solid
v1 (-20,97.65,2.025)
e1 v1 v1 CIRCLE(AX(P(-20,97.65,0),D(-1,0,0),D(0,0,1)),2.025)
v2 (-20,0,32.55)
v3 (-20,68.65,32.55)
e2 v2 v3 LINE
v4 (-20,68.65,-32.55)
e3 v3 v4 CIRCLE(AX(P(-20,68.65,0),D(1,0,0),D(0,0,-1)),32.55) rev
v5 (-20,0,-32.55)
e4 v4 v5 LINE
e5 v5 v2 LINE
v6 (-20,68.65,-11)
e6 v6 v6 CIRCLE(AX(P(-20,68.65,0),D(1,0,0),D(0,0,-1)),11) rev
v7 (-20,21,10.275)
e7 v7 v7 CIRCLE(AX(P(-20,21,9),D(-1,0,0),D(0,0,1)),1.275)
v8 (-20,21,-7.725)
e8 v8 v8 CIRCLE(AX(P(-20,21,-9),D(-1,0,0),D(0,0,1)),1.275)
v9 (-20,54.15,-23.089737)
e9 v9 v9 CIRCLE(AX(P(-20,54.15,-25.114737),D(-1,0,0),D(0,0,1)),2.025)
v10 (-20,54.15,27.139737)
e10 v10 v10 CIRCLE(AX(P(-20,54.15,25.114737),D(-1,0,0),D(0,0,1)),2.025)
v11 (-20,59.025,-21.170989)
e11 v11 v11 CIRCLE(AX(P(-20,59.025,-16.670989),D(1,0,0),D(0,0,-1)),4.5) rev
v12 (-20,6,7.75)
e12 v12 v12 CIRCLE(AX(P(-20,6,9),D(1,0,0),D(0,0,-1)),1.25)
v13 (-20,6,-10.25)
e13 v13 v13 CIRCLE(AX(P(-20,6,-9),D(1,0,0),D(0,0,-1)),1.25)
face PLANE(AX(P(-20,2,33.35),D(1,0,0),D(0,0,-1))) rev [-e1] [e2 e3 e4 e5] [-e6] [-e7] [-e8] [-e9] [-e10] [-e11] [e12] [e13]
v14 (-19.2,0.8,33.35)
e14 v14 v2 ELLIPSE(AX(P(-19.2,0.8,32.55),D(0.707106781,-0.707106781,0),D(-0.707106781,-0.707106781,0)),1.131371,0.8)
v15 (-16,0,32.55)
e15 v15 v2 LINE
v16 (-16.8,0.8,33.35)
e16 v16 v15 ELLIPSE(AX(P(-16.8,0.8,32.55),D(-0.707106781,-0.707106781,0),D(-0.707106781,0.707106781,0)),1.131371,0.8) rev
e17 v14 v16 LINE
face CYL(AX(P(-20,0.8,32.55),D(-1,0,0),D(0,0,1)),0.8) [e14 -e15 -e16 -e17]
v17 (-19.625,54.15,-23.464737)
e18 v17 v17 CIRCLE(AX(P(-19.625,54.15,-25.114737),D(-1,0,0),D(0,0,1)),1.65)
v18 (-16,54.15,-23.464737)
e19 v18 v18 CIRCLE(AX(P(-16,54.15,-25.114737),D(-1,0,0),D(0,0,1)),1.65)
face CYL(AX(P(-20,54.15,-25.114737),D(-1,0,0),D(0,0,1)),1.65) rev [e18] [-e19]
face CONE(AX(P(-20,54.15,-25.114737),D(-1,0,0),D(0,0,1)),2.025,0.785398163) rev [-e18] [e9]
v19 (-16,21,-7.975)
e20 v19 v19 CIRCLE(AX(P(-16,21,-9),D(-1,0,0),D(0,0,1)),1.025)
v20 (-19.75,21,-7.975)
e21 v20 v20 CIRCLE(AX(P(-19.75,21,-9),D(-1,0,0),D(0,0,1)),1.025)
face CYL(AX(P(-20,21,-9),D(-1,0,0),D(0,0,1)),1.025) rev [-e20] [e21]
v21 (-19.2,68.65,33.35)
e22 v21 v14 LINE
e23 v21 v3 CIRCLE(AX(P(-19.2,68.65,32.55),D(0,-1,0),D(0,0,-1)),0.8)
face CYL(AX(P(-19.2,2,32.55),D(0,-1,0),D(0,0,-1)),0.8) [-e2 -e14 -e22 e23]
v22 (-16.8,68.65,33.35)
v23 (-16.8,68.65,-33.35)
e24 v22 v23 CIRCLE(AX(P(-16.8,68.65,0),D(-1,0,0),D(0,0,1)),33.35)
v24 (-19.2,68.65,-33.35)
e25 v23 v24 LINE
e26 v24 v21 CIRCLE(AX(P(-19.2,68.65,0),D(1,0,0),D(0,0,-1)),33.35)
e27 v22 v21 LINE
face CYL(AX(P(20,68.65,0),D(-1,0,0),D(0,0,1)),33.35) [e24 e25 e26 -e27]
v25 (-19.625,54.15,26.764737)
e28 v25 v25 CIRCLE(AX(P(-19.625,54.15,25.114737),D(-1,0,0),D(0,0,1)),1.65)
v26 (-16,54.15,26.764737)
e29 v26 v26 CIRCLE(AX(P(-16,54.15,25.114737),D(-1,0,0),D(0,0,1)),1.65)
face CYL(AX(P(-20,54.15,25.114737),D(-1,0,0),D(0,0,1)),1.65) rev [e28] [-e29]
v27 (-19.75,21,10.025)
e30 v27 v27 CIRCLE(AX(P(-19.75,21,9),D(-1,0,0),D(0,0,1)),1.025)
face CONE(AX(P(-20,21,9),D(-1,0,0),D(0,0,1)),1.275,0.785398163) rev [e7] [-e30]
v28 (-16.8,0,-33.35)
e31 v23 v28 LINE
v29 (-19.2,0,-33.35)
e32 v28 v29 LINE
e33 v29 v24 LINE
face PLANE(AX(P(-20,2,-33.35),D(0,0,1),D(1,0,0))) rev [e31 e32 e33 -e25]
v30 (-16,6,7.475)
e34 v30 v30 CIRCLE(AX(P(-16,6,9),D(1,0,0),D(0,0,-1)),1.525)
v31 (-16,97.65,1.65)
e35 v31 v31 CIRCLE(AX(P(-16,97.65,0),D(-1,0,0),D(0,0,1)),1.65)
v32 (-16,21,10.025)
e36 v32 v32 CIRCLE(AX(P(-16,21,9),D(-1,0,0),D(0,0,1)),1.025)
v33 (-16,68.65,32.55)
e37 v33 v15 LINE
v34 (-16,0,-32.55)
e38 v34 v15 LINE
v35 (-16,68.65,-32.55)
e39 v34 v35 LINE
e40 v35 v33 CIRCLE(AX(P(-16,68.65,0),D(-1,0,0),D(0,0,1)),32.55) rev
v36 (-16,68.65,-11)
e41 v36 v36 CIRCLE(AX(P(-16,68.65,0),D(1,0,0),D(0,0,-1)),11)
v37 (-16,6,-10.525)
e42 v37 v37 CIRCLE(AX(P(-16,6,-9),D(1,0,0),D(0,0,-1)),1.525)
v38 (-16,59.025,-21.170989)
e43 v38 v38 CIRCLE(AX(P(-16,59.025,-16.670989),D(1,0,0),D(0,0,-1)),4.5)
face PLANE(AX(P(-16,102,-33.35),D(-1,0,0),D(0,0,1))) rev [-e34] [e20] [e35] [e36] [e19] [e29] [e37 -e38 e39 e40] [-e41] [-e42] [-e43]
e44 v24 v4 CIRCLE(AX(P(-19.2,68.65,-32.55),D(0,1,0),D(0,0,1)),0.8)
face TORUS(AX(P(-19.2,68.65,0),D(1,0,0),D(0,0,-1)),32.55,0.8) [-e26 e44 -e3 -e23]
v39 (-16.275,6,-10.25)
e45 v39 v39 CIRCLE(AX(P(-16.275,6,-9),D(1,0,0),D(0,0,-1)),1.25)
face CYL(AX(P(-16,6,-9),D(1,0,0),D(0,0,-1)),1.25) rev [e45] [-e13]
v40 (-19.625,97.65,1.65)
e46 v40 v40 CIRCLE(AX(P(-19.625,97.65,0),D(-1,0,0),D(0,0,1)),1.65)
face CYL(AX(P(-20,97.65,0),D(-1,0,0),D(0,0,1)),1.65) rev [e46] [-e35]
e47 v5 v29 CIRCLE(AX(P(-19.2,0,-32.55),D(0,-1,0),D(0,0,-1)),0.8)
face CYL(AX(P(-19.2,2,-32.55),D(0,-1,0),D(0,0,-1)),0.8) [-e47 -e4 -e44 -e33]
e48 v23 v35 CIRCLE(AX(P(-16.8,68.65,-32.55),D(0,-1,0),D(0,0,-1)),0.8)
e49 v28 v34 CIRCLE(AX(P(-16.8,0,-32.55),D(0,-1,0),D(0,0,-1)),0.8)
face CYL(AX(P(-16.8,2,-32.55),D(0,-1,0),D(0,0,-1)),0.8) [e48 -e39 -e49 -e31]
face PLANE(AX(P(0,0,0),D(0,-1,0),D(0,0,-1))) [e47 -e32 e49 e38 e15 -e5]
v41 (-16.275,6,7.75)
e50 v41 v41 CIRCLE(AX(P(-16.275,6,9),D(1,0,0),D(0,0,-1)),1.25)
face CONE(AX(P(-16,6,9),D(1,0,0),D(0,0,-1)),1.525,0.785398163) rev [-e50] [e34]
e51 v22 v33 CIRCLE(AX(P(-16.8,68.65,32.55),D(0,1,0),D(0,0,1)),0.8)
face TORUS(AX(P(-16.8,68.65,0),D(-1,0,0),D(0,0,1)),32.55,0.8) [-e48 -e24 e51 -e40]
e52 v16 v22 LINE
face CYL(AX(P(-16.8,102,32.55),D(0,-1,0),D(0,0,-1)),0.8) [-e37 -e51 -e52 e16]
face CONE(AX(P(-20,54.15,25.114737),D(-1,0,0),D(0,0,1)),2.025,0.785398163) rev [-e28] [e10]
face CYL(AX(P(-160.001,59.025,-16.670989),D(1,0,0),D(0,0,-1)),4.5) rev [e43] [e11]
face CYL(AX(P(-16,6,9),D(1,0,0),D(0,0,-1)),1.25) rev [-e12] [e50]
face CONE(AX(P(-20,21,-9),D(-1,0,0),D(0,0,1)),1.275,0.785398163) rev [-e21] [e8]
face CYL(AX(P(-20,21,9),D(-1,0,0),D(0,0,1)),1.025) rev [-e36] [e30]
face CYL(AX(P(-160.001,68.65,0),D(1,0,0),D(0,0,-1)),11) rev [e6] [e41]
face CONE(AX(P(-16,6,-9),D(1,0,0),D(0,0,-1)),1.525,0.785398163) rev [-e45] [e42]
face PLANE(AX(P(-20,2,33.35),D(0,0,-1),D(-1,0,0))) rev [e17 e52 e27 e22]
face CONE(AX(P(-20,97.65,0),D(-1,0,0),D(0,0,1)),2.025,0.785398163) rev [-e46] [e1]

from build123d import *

# Parameters (mm, degrees)
SKETCH_1_W                   = 40
SKETCH_1_H                   = 66.7
EXTRUDE_1_DEPTH              = 2
SKETCH_2_W                   = 4
SKETCH_2_H                   = 66.7
EXTRUDE_2_DEPTH              = 100
CUT_EXTRUDE_1_DEPTH          = 115.526077816
CUT_EXTRUDE_1_DEPTH_BACK     = 115.526077816
HOLE_WIZARD_M4_1_D           = 3.3
HOLE_WIZARD_M4_1_CSINK_D     = 4.05
HOLE_WIZARD_M4_1_CSINK_ANGLE = 90
HOLE_WIZARD_M4_2_AT_2_COUNT  = 2
HOLE_WIZARD_M4_2_AT_2_PITCH  = 68.59294731
HOLE_WIZARD_M4_2_AT_3_COUNT  = 2
HOLE_WIZARD_M4_2_AT_3_PITCH  = 26
HOLE_WIZARD_M4_2_AT_4_COUNT  = 2
HOLE_WIZARD_M4_2_AT_4_PITCH  = 62.376998966
HOLE_WIZARD_M4_2_AT_5_COUNT  = 2
HOLE_WIZARD_M4_2_AT_5_PITCH  = 56.7
SKETCH_11_W                  = 66.7
SKETCH_11_H                  = 2
EXTRUDE_3_DEPTH              = 100
SKETCH_13_W                  = 40
SKETCH_13_H                  = 66.7
EXTRUDE_4_DEPTH              = 2
SKETCH_14_W                  = 4
SKETCH_14_H                  = 66.7
EXTRUDE_5_DEPTH              = 100
CUT_EXTRUDE_2_DEPTH          = 180.589037806
CUT_EXTRUDE_2_DEPTH_BACK     = 180.589037806
HOLE_WIZARD_M4_3_AT_2_COUNT  = 2
HOLE_WIZARD_M4_3_AT_2_PITCH  = 26
HOLE_WIZARD_M4_3_AT_3_COUNT  = 2
HOLE_WIZARD_M4_3_AT_3_PITCH  = 62.376998966
HOLE_WIZARD_M4_3_AT_4_COUNT  = 2
HOLE_WIZARD_M4_3_AT_4_PITCH  = 56.7
CUT_EXTRUDE_3_REACH          = 181.589
SKETCH_18_R                  = 9.5
CUT_EXTRUDE_4_REACH          = 181.589
SKETCH_21_R                  = 11
CUT_EXTRUDE_5_REACH          = 181.589
SKETCH_22_R                  = 4.5
FILLET_1_R                   = 2
CUT_EXTRUDE_6_REACH          = 193.604
SKETCH_23_W                  = 36
SKETCH_23_H                  = 66.7
CUT_EXTRUDE_7_REACH          = 164.752
SKETCH_24_W                  = 36
SKETCH_24_H                  = 66.7
HOLE_START                   = -124
HOLE_WIZARD_M3_1_OUTLINE_R   = 1.25
HOLE_WIZARD_M3_1_DEPTH       = 4
CUT_EXTRUDE_8_DEPTH          = 154.990981879
CUT_EXTRUDE_8_DEPTH_BACK     = 154.990981879
SKETCH_27_W                  = 104
SKETCH_27_H                  = 66.7
FILLET_2_R                   = 0.8


# Read off the part's stored shape, not the designer's step: M3 螺纹孔1, M2.5 螺纹孔1
with BuildPart() as part:
    # 草图1 → 凸台-拉伸1 (new body)
    with BuildSketch(Plane(origin=(0, 0, 0), x_dir=(1, 0, 0), z_dir=(0, 1, 0))):
        Rectangle(SKETCH_1_W, SKETCH_1_H)
    extrude(amount=EXTRUDE_1_DEPTH)

    # 草图2 → 凸台-拉伸2 (add)
    with BuildSketch(Plane(origin=(0, 2, 0), x_dir=(1, 0, 0), z_dir=(0, 1, 0))):
        with Locations((-18, 0)):
            Rectangle(SKETCH_2_W, SKETCH_2_H)
    extrude(amount=EXTRUDE_2_DEPTH)

    # 草图5 → 切除-拉伸1 (cut, two sides: drawn at the far end of the back side and taken through both)
    with BuildSketch(Plane.ZY.offset(20).offset(-CUT_EXTRUDE_1_DEPTH_BACK)):
        with BuildLine():
            ThreePointArc((0, 102), (23.582011153, 92.232011153), (33.35, 68.65))
            Line((33.35, 68.65), (33.35, 102))
            Line((33.35, 102), (0, 102))
        make_face()
        with BuildLine():
            ThreePointArc((-33.35, 68.65), (-23.582011153, 92.232011153), (0, 102))
            Line((0, 102), (-33.35, 102))
            Line((-33.35, 102), (-33.35, 68.65))
        make_face()
    extrude(amount=CUT_EXTRUDE_1_DEPTH + CUT_EXTRUDE_1_DEPTH_BACK, mode=Mode.SUBTRACT)

    # M4 螺纹孔1 (through all)
    with Locations(Plane.ZY.offset(20)):
        with Locations((0, 97.65), (25.11473671, 54.15), (-25.11473671, 54.15)):
            CounterSinkHole(HOLE_WIZARD_M4_1_D / 2, HOLE_WIZARD_M4_1_CSINK_D / 2, counter_sink_angle=HOLE_WIZARD_M4_1_CSINK_ANGLE)

    # 草图10 → M4 螺纹孔2 (revolve, cut)
    with BuildSketch(Plane(origin=(15, 2, -28.35), x_dir=(0, 0, 1), z_dir=(1, 0, 0))):
        Polygon((0, 0), (0, 2), (1.65, 2), (1.65, 0.375), (2.025, 0), align=None)
    hole_wizard_m4_2 = revolve(axis=Axis((15, 8.35, -28.35), (0, -1, 0)), mode=Mode.SUBTRACT)

    # M4 螺纹孔2 at 2: M4 螺纹孔2 ×2
    with Locations(*[Vector(-0.9508085645250022, 0, 0.3097790722852413) * (i * HOLE_WIZARD_M4_2_AT_2_PITCH) for i in range(1, HOLE_WIZARD_M4_2_AT_2_COUNT)]):
        add(hole_wizard_m4_2, mode=Mode.SUBTRACT)

    # M4 螺纹孔2 at 3: M4 螺纹孔2 ×2
    with Locations(*[(-i * HOLE_WIZARD_M4_2_AT_3_PITCH, 0, 0) for i in range(1, HOLE_WIZARD_M4_2_AT_3_COUNT)]):
        add(hole_wizard_m4_2, mode=Mode.SUBTRACT)

    # M4 螺纹孔2 at 4: M4 螺纹孔2 ×2
    with Locations(*[Vector(-0.4168203092647413, 0, 0.9089889052042635) * (i * HOLE_WIZARD_M4_2_AT_4_PITCH) for i in range(1, HOLE_WIZARD_M4_2_AT_4_COUNT)]):
        add(hole_wizard_m4_2, mode=Mode.SUBTRACT)

    # M4 螺纹孔2 at 5: M4 螺纹孔2 ×2
    with Locations(*[(0, 0, i * HOLE_WIZARD_M4_2_AT_5_PITCH) for i in range(1, HOLE_WIZARD_M4_2_AT_5_COUNT)]):
        add(hole_wizard_m4_2, mode=Mode.SUBTRACT)

    # 草图11 → 凸台-拉伸3 (add)
    with BuildSketch(Plane.ZY.offset(20)):
        with Locations((0, 16)):
            Rectangle(SKETCH_11_W, SKETCH_11_H)
    extrude(amount=EXTRUDE_3_DEPTH)



with BuildPart() as body_2:
    # 草图13 → 凸台-拉伸4 (new body)
    with BuildSketch(Plane(origin=(0, 0, 0), x_dir=(1, 0, 0), z_dir=(0, 1, 0))):
        with Locations((-140, 0)):
            Rectangle(SKETCH_13_W, SKETCH_13_H)
    extrude(amount=EXTRUDE_4_DEPTH)


with BuildPart() as part_1:
    add(part.part)

    add(body_2.part)  # 凸台-拉伸5 merges body 2
    # 草图14 → 凸台-拉伸5 (add)
    with BuildSketch(Plane(origin=(0, 2, 0), x_dir=(1, 0, 0), z_dir=(0, 1, 0))):
        with Locations((-122, 0)):
            Rectangle(SKETCH_14_W, SKETCH_14_H)
    extrude(amount=EXTRUDE_5_DEPTH)

    # 草图15 → 切除-拉伸2 (cut, two sides: drawn at the far end of the back side and taken through both)
    with BuildSketch(Plane.ZY.offset(124).offset(-CUT_EXTRUDE_2_DEPTH_BACK)):
        with BuildLine():
            ThreePointArc((0, 102), (23.582011153, 92.232011153), (33.35, 68.65))
            Line((33.35, 68.65), (33.35, 102))
            Line((33.35, 102), (0, 102))
        make_face()
        with BuildLine():
            ThreePointArc((-33.35, 68.65), (-23.582011153, 92.232011153), (0, 102))
            Line((0, 102), (-33.35, 102))
            Line((-33.35, 102), (-33.35, 68.65))
        make_face()
    extrude(amount=CUT_EXTRUDE_2_DEPTH + CUT_EXTRUDE_2_DEPTH_BACK, mode=Mode.SUBTRACT)

    # 草图17 → M4 螺纹孔3 (revolve, cut)
    with BuildSketch(Plane(origin=(-129, 2, -28.35), x_dir=(0, 0, 1), z_dir=(1, 0, 0))):
        Polygon((0, 0), (0, 2), (1.65, 2), (1.65, 0.375), (2.025, 0), align=None)
    hole_wizard_m4_3 = revolve(axis=Axis((-129, 8.35, -28.35), (0, -1, 0)), mode=Mode.SUBTRACT)

    # M4 螺纹孔3 at 2: M4 螺纹孔3 ×2
    with Locations(*[(-i * HOLE_WIZARD_M4_3_AT_2_PITCH, 0, 0) for i in range(1, HOLE_WIZARD_M4_3_AT_2_COUNT)]):
        add(hole_wizard_m4_3, mode=Mode.SUBTRACT)

    # M4 螺纹孔3 at 3: M4 螺纹孔3 ×2
    with Locations(*[Vector(-0.41682030926474106, 0, 0.9089889052042636) * (i * HOLE_WIZARD_M4_3_AT_3_PITCH) for i in range(1, HOLE_WIZARD_M4_3_AT_3_COUNT)]):
        add(hole_wizard_m4_3, mode=Mode.SUBTRACT)

    # M4 螺纹孔3 at 4: M4 螺纹孔3 ×2
    with Locations(*[(0, 0, i * HOLE_WIZARD_M4_3_AT_4_PITCH) for i in range(1, HOLE_WIZARD_M4_3_AT_4_COUNT)]):
        add(hole_wizard_m4_3, mode=Mode.SUBTRACT)

    # 草图18 → 切除-拉伸3 (cut, up to next)
    with BuildSketch(Plane.ZY.offset(124), mode=Mode.PRIVATE) as cut_extrude_3_sk1:
        with Locations((0, 68.65)):
            Circle(SKETCH_18_R)
    cut_extrude_3_tool1 = extrude(cut_extrude_3_sk1.sketch, amount=-CUT_EXTRUDE_3_REACH, mode=Mode.PRIVATE) & part_1.part
    add(cut_extrude_3_tool1.solids().sort_by_distance((-124, 68.65, 0))[0], mode=Mode.SUBTRACT)

    # 草图21 → 切除-拉伸4 (cut, up to next)
    with BuildSketch(Plane(origin=(-16, 0, 0), x_dir=(0, 0, -1), z_dir=(1, 0, 0)), mode=Mode.PRIVATE) as cut_extrude_4_sk1:
        with Locations((0, 68.65)):
            Circle(SKETCH_21_R)
    cut_extrude_4_tool1 = extrude(cut_extrude_4_sk1.sketch, amount=-CUT_EXTRUDE_4_REACH, mode=Mode.PRIVATE) & part_1.part
    add(cut_extrude_4_tool1.solids().sort_by_distance((-16, 68.65, 0))[0], mode=Mode.SUBTRACT)

    # 草图22 → 切除-拉伸5 (cut, up to next)
    with BuildSketch(Plane(origin=(-16, 0, 0), x_dir=(0, 0, -1), z_dir=(1, 0, 0)), mode=Mode.PRIVATE) as cut_extrude_5_sk1:
        with Locations((16.670989023, 59.025)):
            Circle(SKETCH_22_R)
    cut_extrude_5_tool1 = extrude(cut_extrude_5_sk1.sketch, amount=-CUT_EXTRUDE_5_REACH, mode=Mode.PRIVATE) & part_1.part
    add(cut_extrude_5_tool1.solids().sort_by_distance((-16, 59.025, -16.670989))[0], mode=Mode.SUBTRACT)

    # 圆角1
    fillet_1_edges = [part_1.edges().sort_by_distance(p)[0] for p in [
        (-160, 1, -33.35),
        (-160, 1, 33.35),
        (20, 1, 33.35),
        (20, 1, -33.35),
    ]]
    fillet(fillet_1_edges, radius=FILLET_1_R)

    # 草图23 → 切除-拉伸6 (cut, up to next)
    with BuildSketch(Plane(origin=(0, 2, 0), x_dir=(1, 0, 0), z_dir=(0, 1, 0)), mode=Mode.PRIVATE) as cut_extrude_6_sk1:
        with Locations((-142, 0)):
            Rectangle(SKETCH_23_W, SKETCH_23_H)
    cut_extrude_6_tool1 = extrude(cut_extrude_6_sk1.sketch, amount=-CUT_EXTRUDE_6_REACH, mode=Mode.PRIVATE) & part_1.part
    add(cut_extrude_6_tool1.solids().sort_by_distance((-142, 2, 0))[0], mode=Mode.SUBTRACT)

    # 草图24 → 切除-拉伸7 (cut, up to next)
    with BuildSketch(Plane(origin=(0, 2, 0), x_dir=(1, 0, 0), z_dir=(0, 1, 0)), mode=Mode.PRIVATE) as cut_extrude_7_sk1:
        with Locations((2, 0)):
            Rectangle(SKETCH_24_W, SKETCH_24_H)
    cut_extrude_7_tool1 = extrude(cut_extrude_7_sk1.sketch, amount=-CUT_EXTRUDE_7_REACH, mode=Mode.PRIVATE) & part_1.part
    add(cut_extrude_7_tool1.solids().sort_by_distance((2, 2, 0))[0], mode=Mode.SUBTRACT)

    # M3 螺纹孔1 outline → M3 螺纹孔1 (cut)
    with BuildSketch(Plane.YZ.offset(HOLE_START)):
        with Locations((6, -9)):
            Circle(HOLE_WIZARD_M3_1_OUTLINE_R)
        with Locations((6, 9)):
            Circle(HOLE_WIZARD_M3_1_OUTLINE_R)
    extrude(amount=HOLE_WIZARD_M3_1_DEPTH, mode=Mode.SUBTRACT)

    # Hole Wizard M3 _1 2 outline → Hole Wizard M3 _1 2 (revolve, cut)
    with BuildSketch(Plane(origin=(0, 6, -9), x_dir=(0, 1, 0), z_dir=(0, 0, -1))):
        Polygon((1.525, -16), (0, -16), (0, -20), (1.25, -20), (1.25, -16.275), align=None)
    revolve(axis=Axis((0, 6, -9), (1, 0, 0)), mode=Mode.SUBTRACT)

    # Hole Wizard M3 _1 3 outline → Hole Wizard M3 _1 3 (revolve, cut)
    with BuildSketch(Plane(origin=(0, 6, 9), x_dir=(0, 1, 0), z_dir=(0, 0, -1))):
        Polygon((0, -20), (1.25, -20), (1.25, -16.275), (1.525, -16), (0, -16), align=None)
    revolve(axis=Axis((0, 6, 9), (1, 0, 0)), mode=Mode.SUBTRACT)

    # 草图27 → 切除-拉伸8 (cut, two sides: drawn at the far end of the back side and taken through both)
    with BuildSketch(Plane(origin=(0, 17, 0), x_dir=(1, 0, 0), z_dir=(0, 1, 0)).offset(-CUT_EXTRUDE_8_DEPTH_BACK)):
        with Locations((-72, 0)):
            Rectangle(SKETCH_27_W, SKETCH_27_H)
    extrude(amount=CUT_EXTRUDE_8_DEPTH + CUT_EXTRUDE_8_DEPTH_BACK, mode=Mode.SUBTRACT)

    # M2.5 螺纹孔1 outline → M2.5 螺纹孔1 (revolve, cut)
    with BuildSketch(Plane(origin=(0, 21, -9), x_dir=(0, 1, 0), z_dir=(0, 0, -1))):
        Polygon((1.025, -19.75), (1.025, -16), (0, -16), (0, -20), (1.275, -20), align=None)
    revolve(axis=Axis((0, 21, -9), (1, 0, 0)), mode=Mode.SUBTRACT)

    # Hole Wizard M2.5 _1 2 outline → Hole Wizard M2.5 _1 2 (revolve, cut)
    with BuildSketch(Plane(origin=(0, 21, 9), x_dir=(0, 1, 0), z_dir=(0, 0, -1))):
        Polygon((1.025, -19.75), (1.025, -16), (0, -16), (0, -20), (1.275, -20), align=None)
    revolve(axis=Axis((0, 21, 9), (1, 0, 0)), mode=Mode.SUBTRACT)

    # 圆角2
    fillet_2_edges = [part_1.edges().sort_by_distance(p)[0] for p in [
        (-16, 34.325, -33.35),
        (-20, 34.325, -33.35),
        (-20, 102, 0),
        (-16, 102, 0),
        (-16, 34.325, 33.35),
        (-20, 34.325, 33.35),
        (-18, 0, 33.35),
    ]]
    fillet(fillet_2_edges, radius=FILLET_2_R)


solid = part_1.part
